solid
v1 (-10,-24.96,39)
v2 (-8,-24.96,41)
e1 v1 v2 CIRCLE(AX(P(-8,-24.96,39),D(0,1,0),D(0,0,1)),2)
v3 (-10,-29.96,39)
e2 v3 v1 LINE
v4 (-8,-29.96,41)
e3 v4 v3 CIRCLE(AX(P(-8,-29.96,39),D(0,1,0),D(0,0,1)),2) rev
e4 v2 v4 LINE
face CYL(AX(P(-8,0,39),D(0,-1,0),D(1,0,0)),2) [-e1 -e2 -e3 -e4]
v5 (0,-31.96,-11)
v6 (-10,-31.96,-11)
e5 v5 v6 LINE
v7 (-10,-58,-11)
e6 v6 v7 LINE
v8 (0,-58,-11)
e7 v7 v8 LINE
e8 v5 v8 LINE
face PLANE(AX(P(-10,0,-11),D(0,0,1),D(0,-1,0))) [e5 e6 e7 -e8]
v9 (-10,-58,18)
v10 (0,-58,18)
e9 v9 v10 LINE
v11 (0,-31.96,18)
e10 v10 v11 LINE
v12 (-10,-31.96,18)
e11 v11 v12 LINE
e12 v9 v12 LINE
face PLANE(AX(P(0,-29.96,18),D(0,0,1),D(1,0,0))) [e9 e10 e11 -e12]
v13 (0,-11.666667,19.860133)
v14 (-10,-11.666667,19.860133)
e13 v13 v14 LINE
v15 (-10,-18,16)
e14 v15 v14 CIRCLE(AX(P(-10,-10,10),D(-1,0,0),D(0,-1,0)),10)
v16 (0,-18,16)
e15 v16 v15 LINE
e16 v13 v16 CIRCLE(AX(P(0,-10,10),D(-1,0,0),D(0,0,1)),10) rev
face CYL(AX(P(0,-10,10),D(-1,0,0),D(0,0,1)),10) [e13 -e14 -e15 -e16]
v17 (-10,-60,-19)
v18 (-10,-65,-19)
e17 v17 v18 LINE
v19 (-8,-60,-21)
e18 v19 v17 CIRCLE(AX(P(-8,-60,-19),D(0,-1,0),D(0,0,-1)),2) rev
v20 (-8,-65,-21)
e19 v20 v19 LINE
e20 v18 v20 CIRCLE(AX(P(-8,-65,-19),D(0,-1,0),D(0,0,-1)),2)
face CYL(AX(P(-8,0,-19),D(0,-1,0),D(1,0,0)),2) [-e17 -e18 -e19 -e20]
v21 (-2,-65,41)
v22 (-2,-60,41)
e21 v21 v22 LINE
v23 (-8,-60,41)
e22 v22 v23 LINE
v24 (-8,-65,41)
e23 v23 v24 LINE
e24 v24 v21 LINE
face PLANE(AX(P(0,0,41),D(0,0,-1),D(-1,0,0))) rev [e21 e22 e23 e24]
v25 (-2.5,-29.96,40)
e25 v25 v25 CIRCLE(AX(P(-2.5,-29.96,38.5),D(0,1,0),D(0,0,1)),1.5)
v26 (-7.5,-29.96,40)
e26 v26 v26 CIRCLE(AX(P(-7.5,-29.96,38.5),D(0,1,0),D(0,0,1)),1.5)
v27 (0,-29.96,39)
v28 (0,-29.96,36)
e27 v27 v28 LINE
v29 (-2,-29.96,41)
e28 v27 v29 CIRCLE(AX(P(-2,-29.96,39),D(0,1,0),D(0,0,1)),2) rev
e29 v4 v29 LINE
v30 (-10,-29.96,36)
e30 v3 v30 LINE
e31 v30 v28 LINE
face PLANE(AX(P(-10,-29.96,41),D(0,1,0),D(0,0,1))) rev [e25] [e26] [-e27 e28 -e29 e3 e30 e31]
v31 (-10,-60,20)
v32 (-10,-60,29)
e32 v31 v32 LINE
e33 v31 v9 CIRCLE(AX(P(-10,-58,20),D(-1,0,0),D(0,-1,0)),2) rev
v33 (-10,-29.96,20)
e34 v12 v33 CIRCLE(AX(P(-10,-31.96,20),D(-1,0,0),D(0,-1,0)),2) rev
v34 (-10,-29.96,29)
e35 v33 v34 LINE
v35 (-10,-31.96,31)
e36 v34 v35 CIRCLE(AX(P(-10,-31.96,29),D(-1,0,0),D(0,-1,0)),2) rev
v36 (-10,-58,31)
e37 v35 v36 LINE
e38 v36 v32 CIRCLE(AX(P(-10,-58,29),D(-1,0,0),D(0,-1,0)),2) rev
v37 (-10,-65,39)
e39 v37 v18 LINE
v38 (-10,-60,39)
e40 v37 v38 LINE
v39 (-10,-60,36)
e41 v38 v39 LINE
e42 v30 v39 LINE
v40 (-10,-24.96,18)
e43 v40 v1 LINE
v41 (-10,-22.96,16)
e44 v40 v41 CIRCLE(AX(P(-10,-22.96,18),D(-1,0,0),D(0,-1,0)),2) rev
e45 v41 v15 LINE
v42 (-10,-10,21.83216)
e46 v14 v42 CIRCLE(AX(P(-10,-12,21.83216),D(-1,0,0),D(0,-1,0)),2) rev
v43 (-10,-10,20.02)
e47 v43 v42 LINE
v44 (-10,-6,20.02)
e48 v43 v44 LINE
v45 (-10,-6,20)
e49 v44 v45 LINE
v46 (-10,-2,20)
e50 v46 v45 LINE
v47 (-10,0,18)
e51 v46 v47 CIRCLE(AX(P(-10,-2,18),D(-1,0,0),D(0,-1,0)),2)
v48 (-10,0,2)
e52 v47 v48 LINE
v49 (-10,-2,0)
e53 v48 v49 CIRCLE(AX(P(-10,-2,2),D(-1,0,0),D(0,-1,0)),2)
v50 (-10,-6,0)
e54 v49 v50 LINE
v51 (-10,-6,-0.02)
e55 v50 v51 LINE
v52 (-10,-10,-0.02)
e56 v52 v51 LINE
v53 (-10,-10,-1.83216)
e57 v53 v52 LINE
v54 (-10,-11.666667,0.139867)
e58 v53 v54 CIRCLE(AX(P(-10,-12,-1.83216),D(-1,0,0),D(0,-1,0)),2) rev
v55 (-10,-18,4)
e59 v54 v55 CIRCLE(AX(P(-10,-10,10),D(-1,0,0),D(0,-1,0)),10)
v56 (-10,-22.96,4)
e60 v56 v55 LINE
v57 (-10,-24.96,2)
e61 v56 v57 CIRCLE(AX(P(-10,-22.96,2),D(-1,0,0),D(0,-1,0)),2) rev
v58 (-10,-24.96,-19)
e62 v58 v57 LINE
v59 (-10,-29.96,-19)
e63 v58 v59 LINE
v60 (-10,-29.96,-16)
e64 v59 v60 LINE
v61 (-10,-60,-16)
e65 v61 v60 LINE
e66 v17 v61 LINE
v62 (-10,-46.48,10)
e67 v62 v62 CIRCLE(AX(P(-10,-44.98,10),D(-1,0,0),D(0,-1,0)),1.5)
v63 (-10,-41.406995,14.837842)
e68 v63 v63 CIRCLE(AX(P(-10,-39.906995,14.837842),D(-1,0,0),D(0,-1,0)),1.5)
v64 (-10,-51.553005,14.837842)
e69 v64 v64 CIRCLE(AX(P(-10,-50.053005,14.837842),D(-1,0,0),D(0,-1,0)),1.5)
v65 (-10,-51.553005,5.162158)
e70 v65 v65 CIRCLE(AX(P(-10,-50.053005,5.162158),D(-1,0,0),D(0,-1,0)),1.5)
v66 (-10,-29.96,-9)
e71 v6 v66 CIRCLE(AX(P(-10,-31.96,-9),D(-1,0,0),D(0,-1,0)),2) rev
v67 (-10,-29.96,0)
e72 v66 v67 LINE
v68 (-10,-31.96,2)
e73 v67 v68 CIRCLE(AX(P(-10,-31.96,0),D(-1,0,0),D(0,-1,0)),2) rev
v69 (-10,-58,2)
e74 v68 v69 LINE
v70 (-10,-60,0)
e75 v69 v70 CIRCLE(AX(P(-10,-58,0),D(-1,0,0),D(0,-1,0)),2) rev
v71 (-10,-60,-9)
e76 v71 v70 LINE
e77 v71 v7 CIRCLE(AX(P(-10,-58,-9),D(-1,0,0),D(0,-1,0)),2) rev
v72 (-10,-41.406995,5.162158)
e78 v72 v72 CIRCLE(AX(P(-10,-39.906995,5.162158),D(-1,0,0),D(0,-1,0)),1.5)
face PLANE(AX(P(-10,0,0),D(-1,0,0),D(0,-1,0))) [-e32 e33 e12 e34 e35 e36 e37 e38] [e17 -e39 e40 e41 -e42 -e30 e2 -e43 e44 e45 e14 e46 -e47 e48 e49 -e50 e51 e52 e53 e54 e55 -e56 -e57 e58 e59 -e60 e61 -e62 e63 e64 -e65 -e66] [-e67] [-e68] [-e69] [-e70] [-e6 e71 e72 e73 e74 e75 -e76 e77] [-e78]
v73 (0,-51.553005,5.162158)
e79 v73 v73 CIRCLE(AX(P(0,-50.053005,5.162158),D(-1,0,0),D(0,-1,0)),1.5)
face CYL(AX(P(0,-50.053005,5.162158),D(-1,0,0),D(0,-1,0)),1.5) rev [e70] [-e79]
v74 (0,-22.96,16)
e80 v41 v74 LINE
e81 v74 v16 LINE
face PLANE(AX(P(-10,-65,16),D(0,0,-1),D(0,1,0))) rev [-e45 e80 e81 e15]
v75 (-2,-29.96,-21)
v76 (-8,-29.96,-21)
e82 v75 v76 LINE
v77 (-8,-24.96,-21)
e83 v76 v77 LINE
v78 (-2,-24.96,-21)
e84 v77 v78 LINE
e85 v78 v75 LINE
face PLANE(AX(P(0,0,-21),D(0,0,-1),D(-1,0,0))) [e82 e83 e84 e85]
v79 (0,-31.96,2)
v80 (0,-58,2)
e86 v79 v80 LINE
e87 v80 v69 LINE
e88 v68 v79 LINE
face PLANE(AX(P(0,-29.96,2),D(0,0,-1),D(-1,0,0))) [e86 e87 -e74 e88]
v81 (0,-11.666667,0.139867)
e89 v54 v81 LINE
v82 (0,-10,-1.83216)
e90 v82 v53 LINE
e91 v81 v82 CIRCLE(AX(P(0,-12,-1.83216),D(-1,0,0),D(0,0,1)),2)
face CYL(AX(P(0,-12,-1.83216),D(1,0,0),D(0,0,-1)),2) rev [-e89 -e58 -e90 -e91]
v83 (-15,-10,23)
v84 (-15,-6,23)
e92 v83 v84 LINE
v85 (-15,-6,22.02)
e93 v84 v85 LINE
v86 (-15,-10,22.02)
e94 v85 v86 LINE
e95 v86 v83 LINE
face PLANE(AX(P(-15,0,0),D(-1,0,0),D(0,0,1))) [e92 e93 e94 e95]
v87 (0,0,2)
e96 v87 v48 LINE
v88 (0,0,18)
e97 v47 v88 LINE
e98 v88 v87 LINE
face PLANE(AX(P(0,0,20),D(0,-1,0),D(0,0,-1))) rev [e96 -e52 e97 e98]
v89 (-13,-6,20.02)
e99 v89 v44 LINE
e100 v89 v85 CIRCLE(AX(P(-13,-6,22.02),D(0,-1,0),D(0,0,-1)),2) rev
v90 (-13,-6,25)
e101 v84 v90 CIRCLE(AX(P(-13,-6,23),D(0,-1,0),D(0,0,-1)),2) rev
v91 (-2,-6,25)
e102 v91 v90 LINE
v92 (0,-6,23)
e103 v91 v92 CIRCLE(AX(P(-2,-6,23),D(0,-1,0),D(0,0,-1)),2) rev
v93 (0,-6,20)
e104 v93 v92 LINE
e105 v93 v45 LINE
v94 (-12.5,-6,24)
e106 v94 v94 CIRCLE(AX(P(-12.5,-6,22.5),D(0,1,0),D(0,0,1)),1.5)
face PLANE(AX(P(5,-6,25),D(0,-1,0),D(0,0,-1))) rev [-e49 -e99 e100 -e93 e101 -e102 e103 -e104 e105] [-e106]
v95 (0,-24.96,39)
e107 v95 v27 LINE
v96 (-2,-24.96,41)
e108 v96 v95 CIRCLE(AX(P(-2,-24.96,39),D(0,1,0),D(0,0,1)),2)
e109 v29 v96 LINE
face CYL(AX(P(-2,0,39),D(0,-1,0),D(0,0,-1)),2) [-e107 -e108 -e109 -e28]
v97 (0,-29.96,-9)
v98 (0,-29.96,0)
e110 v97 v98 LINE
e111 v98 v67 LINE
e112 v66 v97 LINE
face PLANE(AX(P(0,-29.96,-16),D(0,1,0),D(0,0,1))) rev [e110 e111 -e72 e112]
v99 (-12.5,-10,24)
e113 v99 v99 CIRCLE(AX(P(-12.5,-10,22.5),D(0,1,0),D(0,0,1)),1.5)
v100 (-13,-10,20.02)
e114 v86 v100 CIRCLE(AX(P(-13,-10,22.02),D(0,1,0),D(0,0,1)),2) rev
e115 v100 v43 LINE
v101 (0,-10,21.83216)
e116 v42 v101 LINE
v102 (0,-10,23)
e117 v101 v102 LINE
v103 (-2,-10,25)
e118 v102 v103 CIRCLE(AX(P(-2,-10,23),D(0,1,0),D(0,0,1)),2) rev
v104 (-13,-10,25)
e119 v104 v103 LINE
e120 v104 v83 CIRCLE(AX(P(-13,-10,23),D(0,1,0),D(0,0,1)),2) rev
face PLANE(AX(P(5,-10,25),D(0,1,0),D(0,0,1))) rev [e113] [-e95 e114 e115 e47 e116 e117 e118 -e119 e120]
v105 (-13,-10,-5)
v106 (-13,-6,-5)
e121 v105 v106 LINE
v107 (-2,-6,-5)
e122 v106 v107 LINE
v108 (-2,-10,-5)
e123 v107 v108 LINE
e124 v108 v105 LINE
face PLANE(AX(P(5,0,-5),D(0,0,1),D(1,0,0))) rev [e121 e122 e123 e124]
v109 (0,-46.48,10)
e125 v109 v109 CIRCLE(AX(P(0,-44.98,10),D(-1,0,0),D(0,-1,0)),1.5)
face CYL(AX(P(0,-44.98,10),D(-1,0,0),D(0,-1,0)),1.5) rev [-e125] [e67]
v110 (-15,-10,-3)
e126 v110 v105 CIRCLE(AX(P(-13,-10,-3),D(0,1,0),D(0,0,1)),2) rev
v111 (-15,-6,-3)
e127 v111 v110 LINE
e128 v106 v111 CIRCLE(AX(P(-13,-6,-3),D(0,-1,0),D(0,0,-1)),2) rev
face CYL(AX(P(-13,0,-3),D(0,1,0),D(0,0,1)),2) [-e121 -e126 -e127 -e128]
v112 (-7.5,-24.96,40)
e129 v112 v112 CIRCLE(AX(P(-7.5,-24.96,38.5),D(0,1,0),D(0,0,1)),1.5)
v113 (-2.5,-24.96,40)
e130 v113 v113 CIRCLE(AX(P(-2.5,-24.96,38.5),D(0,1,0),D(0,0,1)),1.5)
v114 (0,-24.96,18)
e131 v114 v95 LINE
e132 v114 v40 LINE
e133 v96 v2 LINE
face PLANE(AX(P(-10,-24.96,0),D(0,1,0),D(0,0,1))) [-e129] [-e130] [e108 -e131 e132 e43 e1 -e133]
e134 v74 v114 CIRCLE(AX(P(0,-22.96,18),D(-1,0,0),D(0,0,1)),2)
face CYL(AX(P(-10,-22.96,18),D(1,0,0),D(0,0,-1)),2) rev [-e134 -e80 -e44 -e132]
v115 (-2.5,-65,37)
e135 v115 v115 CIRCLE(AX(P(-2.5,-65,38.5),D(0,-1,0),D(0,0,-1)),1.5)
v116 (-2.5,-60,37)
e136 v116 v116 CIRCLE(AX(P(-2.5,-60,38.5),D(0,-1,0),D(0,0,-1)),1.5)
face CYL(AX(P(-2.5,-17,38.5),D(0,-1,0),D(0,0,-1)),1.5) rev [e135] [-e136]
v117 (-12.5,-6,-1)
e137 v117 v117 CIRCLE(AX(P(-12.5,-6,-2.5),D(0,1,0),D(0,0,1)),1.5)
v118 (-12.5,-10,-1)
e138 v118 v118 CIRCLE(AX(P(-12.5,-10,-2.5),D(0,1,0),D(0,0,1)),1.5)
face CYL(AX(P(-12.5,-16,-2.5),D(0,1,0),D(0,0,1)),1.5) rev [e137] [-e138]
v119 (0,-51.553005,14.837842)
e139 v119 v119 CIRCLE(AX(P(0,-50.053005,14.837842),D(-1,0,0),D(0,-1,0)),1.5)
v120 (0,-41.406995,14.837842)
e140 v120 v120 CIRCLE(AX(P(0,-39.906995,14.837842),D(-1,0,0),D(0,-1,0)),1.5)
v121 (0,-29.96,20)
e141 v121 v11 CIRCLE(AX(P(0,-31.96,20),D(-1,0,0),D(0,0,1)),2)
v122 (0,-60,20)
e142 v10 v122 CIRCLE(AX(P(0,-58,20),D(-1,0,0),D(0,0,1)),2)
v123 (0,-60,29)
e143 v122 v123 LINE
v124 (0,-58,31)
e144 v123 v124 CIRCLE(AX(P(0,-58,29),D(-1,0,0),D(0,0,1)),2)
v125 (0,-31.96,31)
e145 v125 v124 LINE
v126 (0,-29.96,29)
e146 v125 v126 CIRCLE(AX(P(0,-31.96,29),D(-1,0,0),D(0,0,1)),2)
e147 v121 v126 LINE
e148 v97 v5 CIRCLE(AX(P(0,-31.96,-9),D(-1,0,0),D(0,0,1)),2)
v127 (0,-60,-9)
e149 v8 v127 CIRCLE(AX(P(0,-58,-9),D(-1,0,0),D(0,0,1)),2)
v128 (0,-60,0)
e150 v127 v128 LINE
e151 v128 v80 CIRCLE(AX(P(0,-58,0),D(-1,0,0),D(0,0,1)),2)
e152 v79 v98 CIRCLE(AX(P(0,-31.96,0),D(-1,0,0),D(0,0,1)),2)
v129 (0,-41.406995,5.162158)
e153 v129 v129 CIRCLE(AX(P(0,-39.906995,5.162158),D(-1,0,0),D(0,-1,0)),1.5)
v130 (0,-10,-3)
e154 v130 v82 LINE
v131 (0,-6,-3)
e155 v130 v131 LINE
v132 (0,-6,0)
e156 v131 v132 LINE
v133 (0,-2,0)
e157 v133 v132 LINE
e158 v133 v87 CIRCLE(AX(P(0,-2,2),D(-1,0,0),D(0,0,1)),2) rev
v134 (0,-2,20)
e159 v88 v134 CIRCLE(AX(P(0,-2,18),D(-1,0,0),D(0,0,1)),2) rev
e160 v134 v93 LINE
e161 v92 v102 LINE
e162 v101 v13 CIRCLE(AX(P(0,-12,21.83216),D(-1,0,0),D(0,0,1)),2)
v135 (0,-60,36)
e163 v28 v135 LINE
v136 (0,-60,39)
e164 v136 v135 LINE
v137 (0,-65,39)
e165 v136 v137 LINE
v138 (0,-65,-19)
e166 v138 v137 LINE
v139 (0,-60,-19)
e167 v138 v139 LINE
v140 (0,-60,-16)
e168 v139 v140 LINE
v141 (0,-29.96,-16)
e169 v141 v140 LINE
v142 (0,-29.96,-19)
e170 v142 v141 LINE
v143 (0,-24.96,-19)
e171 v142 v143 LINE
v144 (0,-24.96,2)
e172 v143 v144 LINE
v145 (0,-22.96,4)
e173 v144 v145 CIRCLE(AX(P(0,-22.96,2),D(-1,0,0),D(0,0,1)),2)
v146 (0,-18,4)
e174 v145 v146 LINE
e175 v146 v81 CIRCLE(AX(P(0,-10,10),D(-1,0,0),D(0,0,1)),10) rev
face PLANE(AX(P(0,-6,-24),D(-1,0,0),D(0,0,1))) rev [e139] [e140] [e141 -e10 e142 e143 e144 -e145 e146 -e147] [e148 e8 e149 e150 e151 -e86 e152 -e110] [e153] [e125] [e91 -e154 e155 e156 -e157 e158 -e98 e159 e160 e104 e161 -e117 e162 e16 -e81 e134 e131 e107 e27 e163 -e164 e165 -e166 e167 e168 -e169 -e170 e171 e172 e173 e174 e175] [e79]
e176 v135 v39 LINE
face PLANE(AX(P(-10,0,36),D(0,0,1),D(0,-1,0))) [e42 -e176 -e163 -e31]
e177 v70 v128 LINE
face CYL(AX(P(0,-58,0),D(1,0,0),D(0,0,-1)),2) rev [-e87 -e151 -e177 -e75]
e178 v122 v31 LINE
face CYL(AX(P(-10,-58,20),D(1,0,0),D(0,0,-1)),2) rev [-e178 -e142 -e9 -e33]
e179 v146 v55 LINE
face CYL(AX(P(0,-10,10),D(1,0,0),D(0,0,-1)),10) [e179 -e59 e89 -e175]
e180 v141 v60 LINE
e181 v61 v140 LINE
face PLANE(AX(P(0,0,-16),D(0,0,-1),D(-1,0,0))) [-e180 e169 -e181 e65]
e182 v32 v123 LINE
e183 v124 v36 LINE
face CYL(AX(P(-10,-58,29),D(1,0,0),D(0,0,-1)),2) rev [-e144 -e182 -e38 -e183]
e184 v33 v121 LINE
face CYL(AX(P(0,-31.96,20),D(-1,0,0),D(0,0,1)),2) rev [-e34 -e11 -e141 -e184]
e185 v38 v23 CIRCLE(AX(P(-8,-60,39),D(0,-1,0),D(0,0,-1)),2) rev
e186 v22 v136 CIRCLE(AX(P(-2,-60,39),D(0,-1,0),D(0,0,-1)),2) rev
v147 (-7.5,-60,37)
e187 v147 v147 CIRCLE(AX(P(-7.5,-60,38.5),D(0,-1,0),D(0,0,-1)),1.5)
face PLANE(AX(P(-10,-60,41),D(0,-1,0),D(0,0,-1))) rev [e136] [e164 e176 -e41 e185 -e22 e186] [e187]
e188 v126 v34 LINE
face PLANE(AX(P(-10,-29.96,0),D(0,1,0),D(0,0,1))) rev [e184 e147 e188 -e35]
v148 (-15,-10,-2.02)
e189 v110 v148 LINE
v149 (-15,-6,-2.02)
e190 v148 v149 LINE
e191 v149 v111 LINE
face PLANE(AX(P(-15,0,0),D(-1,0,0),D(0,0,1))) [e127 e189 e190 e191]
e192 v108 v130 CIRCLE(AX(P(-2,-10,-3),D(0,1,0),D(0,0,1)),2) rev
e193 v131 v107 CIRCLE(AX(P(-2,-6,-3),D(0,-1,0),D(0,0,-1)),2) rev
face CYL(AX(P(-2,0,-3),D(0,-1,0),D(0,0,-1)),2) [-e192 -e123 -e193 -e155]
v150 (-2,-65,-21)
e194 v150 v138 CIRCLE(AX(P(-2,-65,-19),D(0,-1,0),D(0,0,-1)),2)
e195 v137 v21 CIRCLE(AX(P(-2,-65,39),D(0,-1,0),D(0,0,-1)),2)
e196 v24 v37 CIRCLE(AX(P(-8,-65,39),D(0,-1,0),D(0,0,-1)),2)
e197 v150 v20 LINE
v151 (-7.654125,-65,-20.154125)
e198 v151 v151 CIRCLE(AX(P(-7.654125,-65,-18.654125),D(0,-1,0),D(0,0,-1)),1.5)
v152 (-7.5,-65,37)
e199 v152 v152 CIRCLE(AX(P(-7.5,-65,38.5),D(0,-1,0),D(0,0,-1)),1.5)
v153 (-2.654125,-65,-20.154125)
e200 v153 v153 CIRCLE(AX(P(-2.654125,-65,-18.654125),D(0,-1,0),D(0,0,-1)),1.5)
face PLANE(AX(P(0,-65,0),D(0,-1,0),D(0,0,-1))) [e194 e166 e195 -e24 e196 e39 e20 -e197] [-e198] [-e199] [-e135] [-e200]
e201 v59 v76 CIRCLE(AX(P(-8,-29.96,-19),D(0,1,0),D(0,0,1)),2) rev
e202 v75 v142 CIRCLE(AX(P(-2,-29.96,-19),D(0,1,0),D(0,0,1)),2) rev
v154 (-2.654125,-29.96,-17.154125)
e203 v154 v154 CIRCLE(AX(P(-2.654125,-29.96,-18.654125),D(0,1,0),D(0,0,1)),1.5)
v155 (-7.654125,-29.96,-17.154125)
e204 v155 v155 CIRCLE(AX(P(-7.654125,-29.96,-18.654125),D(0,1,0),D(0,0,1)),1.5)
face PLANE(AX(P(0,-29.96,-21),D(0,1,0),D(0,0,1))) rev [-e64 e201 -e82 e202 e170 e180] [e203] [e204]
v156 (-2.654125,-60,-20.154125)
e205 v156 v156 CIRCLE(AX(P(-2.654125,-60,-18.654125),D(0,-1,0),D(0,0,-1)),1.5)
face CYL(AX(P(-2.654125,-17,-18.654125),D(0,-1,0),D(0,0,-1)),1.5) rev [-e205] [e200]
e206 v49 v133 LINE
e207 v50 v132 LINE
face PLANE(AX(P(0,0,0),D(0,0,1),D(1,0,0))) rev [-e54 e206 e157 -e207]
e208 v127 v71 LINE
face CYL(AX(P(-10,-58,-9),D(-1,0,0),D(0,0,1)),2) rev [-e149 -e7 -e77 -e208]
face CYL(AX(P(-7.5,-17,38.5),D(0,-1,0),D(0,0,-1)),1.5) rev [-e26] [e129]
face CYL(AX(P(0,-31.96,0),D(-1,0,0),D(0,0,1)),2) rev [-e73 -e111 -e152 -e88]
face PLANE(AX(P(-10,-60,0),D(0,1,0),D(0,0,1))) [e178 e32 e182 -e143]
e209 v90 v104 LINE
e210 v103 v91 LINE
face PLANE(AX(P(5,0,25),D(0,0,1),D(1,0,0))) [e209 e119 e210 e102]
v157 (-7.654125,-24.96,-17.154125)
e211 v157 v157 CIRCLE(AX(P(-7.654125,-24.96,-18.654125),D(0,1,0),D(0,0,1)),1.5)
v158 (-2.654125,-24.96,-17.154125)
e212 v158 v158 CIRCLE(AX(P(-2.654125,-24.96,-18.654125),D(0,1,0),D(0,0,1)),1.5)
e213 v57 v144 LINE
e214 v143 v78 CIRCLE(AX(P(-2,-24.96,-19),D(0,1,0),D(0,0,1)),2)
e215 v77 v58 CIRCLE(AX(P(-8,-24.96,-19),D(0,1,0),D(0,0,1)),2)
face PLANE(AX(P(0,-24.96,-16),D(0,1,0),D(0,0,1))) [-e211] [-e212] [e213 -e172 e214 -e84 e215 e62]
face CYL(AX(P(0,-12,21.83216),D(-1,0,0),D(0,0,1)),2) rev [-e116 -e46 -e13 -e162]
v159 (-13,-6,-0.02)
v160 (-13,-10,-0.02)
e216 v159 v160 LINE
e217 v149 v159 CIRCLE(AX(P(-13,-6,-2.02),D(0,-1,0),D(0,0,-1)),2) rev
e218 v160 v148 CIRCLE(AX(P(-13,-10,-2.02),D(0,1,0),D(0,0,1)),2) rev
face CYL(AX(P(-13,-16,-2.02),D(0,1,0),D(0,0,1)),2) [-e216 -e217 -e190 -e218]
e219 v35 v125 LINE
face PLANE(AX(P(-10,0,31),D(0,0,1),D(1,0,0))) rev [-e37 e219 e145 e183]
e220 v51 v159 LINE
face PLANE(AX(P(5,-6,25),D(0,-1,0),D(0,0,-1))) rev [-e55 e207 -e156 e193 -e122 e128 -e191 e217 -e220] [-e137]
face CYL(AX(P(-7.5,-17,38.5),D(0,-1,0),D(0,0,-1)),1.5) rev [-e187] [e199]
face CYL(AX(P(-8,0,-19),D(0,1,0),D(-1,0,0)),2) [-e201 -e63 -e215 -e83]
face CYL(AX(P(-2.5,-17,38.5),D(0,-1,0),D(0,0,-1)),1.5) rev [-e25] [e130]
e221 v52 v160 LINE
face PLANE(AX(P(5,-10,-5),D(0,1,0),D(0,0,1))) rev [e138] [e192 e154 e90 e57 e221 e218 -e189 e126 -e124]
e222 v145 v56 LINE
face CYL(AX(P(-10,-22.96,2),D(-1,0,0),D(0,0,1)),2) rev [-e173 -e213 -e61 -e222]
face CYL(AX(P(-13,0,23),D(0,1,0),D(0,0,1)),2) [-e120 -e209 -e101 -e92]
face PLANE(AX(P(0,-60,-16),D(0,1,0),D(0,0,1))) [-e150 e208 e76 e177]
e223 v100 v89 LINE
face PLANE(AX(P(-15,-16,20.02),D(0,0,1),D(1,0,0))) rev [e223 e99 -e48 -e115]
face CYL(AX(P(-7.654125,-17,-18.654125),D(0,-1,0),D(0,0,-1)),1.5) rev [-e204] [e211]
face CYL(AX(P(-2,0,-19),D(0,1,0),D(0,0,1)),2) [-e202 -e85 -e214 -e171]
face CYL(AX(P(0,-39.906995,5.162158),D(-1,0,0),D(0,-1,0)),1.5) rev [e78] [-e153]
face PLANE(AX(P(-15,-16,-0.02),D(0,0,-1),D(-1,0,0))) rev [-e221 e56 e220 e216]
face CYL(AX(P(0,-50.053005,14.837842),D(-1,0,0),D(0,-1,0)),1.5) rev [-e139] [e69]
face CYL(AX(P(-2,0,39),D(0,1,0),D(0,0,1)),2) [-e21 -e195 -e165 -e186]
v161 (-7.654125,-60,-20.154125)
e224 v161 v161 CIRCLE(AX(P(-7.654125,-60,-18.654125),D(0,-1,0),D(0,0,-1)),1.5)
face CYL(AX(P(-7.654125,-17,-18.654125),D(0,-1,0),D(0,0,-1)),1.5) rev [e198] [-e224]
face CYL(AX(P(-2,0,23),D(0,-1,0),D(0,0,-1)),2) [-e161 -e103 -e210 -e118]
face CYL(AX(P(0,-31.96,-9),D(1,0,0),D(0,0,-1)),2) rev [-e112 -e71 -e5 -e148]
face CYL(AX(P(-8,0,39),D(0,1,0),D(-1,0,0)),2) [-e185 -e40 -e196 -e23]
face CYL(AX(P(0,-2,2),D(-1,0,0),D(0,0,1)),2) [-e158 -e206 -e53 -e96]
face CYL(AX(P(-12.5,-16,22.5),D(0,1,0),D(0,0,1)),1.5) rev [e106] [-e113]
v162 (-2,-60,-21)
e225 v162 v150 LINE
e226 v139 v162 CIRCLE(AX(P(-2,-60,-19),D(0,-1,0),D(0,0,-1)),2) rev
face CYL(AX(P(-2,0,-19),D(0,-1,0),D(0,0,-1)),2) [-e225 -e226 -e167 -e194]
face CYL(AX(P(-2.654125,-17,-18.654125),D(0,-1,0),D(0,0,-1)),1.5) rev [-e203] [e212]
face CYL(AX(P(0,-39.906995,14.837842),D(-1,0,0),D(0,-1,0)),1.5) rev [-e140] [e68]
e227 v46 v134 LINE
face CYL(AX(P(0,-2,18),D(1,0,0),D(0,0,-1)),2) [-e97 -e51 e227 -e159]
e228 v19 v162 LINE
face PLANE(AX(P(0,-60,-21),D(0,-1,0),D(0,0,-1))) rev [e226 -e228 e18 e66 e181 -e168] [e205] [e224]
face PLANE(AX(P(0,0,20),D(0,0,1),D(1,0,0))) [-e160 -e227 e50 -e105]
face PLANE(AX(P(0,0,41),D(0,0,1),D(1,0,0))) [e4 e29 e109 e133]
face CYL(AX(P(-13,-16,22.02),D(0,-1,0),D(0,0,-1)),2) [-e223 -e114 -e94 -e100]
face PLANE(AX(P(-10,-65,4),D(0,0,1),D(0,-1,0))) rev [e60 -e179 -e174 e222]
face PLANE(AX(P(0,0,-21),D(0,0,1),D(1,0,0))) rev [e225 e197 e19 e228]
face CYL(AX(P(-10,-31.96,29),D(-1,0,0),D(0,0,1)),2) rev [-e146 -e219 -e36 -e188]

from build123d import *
from build123d.topology import SkipClean

# Parameters (mm, degrees)
SKETCH1_W            = 90
SKETCH1_H            = 20
BOSS_EXTRUDE1_DEPTH  = 20
SKETCH2_W            = 90
SKETCH2_H            = 3
CUT_EXTRUDE1_DEPTH   = 10
SKETCH3_W            = 3
SKETCH3_H            = 5
CUT_EXTRUDE2_DEPTH   = 10
SKETCH4_W            = 3
SKETCH4_H            = 1.75
SKETCH4_W_2          = 2.997618753
SKETCH4_W_3          = 3.002941468
CUT_EXTRUDE3_DEPTH   = 5
SKETCH5_W            = 1.5
SKETCH5_H            = 3
BOSS_EXTRUDE2_DEPTH  = 10
SKETCH6_W            = 1.5
SKETCH6_H            = 3
BOSS_EXTRUDE3_DEPTH  = 18
BOSS_EXTRUDE4_DEPTH  = 5
FILLET1_START        = 8.5
FILLET1_DEPTH        = 3
FILLET1_START_2      = 8
FILLET1_2_DEPTH      = 4
FILLET2_R            = 10
SKETCH8_W            = 20.140972823
SKETCH8_H            = 2
CUT_EXTRUDE4_DEPTH   = 119
FILLET3_R            = 2
SKETCH9_W            = 5
SKETCH9_H            = 4
BOSS_EXTRUDE6_DEPTH  = 5
SKETCH11_W           = 5
SKETCH11_H           = 4
BOSS_EXTRUDE7_DEPTH  = 5
SKETCH12_R           = 1.5
CUT_EXTRUDE5_DEPTH   = 24
FILLET4_R            = 2
SKETCH14_W           = 71.95999564
SKETCH14_H           = 44.647918029
CUT_EXTRUDE8_DEPTH   = 55
BOSS_EXTRUDE8_START  = 1.5
BOSS_EXTRUDE8_DEPTH  = 1.5
SKETCH16_W           = 5.976122604
SKETCH16_H           = 3
CUT_EXTRUDE9_DEPTH   = 10
SKETCH17_W           = 2
SKETCH17_H           = 3
BOSS_EXTRUDE9_DEPTH  = 10
BOSS_EXTRUDE10_DEPTH = 5
BOSS_EXTRUDE11_DEPTH = 10
SKETCH21_W           = 10
SKETCH21_H           = 4
BOSS_EXTRUDE21_DEPTH = 5
SKETCH22_R           = 1.5
CUT_EXTRUDE10_DEPTH  = 5
SKETCH23_W           = 10
SKETCH23_H           = 4
BOSS_EXTRUDE22_DEPTH = 5
SKETCH24_R           = 1.5
CUT_EXTRUDE11_DEPTH  = 5
SKETCH25_W           = 46.117576458
SKETCH25_H           = 7.536313902
CUT_EXTRUDE12_DEPTH  = 49
SKETCH26_W           = 45
SKETCH26_H           = 20
CUT_EXTRUDE13_DEPTH  = 49
SKETCH27_W           = 5
SKETCH27_H           = 4
BOSS_EXTRUDE23_DEPTH = 10
SKETCH28_R           = 1.5
CUT_EXTRUDE14_DEPTH  = 10
SKETCH29_W           = 5
SKETCH29_H           = 0.02
CUT_EXTRUDE15_DEPTH  = 10
FILLET8_R            = 2
SKETCH30_W           = 3
SKETCH30_H           = 12
CUT_EXTRUDE16_DEPTH  = 15
FILLET10_R           = 2
SKETCH32_R           = 1.5
CUT_EXTRUDE17_DEPTH  = 7.5
FILLET11_START       = -10
FILLET11_DEPTH       = 10
FILLET11_START_2     = -10.30822
FILLET11_2_DEPTH     = 10.61644
FILLET11_START_3     = -14.991159554
FILLET11_3_DEPTH     = 19.982319108
FILLET11_START_4     = -11.666666667
FILLET11_4_OUTLINE_R = 1.5
FILLET11_4_DEPTH     = 1.666666667
CUT_EXTRUDE19_DEPTH  = 32
SKETCH35_W           = 10
SKETCH35_H           = 12
BOSS_EXTRUDE24_DEPTH = 10
SKETCH36_W           = 10
SKETCH36_H           = 12
BOSS_EXTRUDE25_DEPTH = 16
SKETCH37_W           = 8.422588627
SKETCH37_H           = 30.638855418
CUT_EXTRUDE20_DEPTH  = 16
FILLET12_R           = 2
SKETCH38_W           = 10
SKETCH38_H           = 12
BOSS_EXTRUDE26_DEPTH = 47
SKETCH39_W           = 10
SKETCH39_H           = 5
BOSS_EXTRUDE27_DEPTH = 20
SKETCH41_W           = 5
SKETCH41_H           = 30.04
SKETCH41_W_2         = 15
SKETCH41_H_2         = 5
BOSS_EXTRUDE28_DEPTH = 10
SKETCH42_W           = 10
SKETCH42_H           = 5
BOSS_EXTRUDE29_DEPTH = 5
SKETCH43_W           = 10
SKETCH43_H           = 5
BOSS_EXTRUDE30_DEPTH = 5
SKETCH44_R           = 1.5
CUT_EXTRUDE21_DEPTH  = 48
FILLET13_R           = 2
SKETCH45_W           = 16
SKETCH45_H           = 30.04
BOSS_EXTRUDE31_DEPTH = 10
SKETCH46_R           = 1.5
CUT_EXTRUDE22_DEPTH  = 10
FILLET14_R           = 2


with BuildPart() as part:
    # Sketch1 → Boss-Extrude1 (new body)
    with BuildSketch(Plane.XY):
        with Locations((45, -10)):
            Rectangle(SKETCH1_W, SKETCH1_H)
    extrude(amount=BOSS_EXTRUDE1_DEPTH)

    # Sketch2 → Cut-Extrude1 (cut)
    with BuildSketch(Plane(origin=(0, 0, 0), x_dir=(1, 0, 0), z_dir=(0, 1, 0))):
        with Locations((45, -10)):
            Rectangle(SKETCH2_W, SKETCH2_H)
    extrude(amount=-CUT_EXTRUDE1_DEPTH, mode=Mode.SUBTRACT)

    # Sketch3 → Cut-Extrude2 (cut)
    with BuildSketch(Plane(origin=(0, 0, 0), x_dir=(1, 0, 0), z_dir=(0, 1, 0))):
        with Locations((11.25, -15.75)):
            Rectangle(SKETCH3_W, SKETCH3_H)
        with Locations((22.5, -15.75)):
            Rectangle(SKETCH3_W, SKETCH3_H)
        with Locations((33.75, -15.75)):
            Rectangle(SKETCH3_W, SKETCH3_H)
        with Locations((45, -15.75)):
            Rectangle(SKETCH3_W, SKETCH3_H)
        with Locations((56.25, -15.75)):
            Rectangle(SKETCH3_W, SKETCH3_H)
        with Locations((67.5, -15.75)):
            Rectangle(SKETCH3_W, SKETCH3_H)
        with Locations((78.75, -15.75)):
            Rectangle(SKETCH3_W, SKETCH3_H)
        with Locations((11.25, -4.25)):
            Rectangle(SKETCH3_W, SKETCH3_H)
        with Locations((22.5, -4.25)):
            Rectangle(SKETCH3_W, SKETCH3_H)
        with Locations((33.75, -4.25)):
            Rectangle(SKETCH3_W, SKETCH3_H)
        with Locations((45, -4.25)):
            Rectangle(SKETCH3_W, SKETCH3_H)
        with Locations((56.25, -4.25)):
            Rectangle(SKETCH3_W, SKETCH3_H)
        with Locations((67.5, -4.25)):
            Rectangle(SKETCH3_W, SKETCH3_H)
        with Locations((78.75, -4.25)):
            Rectangle(SKETCH3_W, SKETCH3_H)
    extrude(amount=-CUT_EXTRUDE2_DEPTH, mode=Mode.SUBTRACT)

    # Sketch4 → Cut-Extrude3 (cut)
    with BuildSketch(Plane(origin=(0, 0, 0), x_dir=(1, 0, 0), z_dir=(0, 1, 0))):
        with Locations((56.25, -19.125)):
            Rectangle(SKETCH4_W, SKETCH4_H)
        with Locations((67.5, -19.125)):
            Rectangle(SKETCH4_W, SKETCH4_H)
        Polygon((77.25, -18.25), (77.25, -20), (80.252941468, -20), (80.252941468, -18.25), (80.25, -18.25), align=None)
        with Locations((45, -19.125)):
            Rectangle(SKETCH4_W, SKETCH4_H)
        with Locations((33.748809377, -19.125)):
            Rectangle(SKETCH4_W_2, SKETCH4_H)
        with Locations((22.5, -19.125)):
            Rectangle(SKETCH4_W, SKETCH4_H)
        with Locations((11.25, -19.125)):
            Rectangle(SKETCH4_W, SKETCH4_H)
        with Locations((22.5, -0.875)):
            Rectangle(SKETCH4_W, SKETCH4_H)
        with Locations((33.748809377, -0.875)):
            Rectangle(SKETCH4_W_2, SKETCH4_H)
        with Locations((45, -0.875)):
            Rectangle(SKETCH4_W, SKETCH4_H)
        with Locations((56.25, -0.875)):
            Rectangle(SKETCH4_W, SKETCH4_H)
        with Locations((67.5, -0.875)):
            Rectangle(SKETCH4_W, SKETCH4_H)
        with Locations((78.751470734, -0.875)):
            Rectangle(SKETCH4_W_3, SKETCH4_H)
        with Locations((11.25, -0.875)):
            Rectangle(SKETCH4_W, SKETCH4_H)
    extrude(amount=-CUT_EXTRUDE3_DEPTH, mode=Mode.SUBTRACT)

    # Sketch5 → Boss-Extrude2 (add)
    with BuildSketch(Plane(origin=(0, -10, 0), x_dir=(1, 0, 0), z_dir=(0, 1, 0))):
        with Locations((0.75, -10)):
            Rectangle(SKETCH5_W, SKETCH5_H)
        with Locations((89.25, -10)):
            Rectangle(SKETCH5_W, SKETCH5_H)
    extrude(amount=BOSS_EXTRUDE2_DEPTH)

    # Sketch6 → Boss-Extrude3 (add)
    with BuildSketch(Plane(origin=(0, 0, 0), x_dir=(1, 0, 0), z_dir=(0, 1, 0))):
        with Locations((2.25, -10)):
            Rectangle(SKETCH6_W, SKETCH6_H)
        with Locations((87.75, -10)):
            Rectangle(SKETCH6_W, SKETCH6_H)
    extrude(amount=-BOSS_EXTRUDE3_DEPTH)

    # Sketch7 → Boss-Extrude4 (add)
    with BuildSketch(Plane.XY.offset(8.5)):
        Polygon((3, -9.907661673), (3, -10), (6, -10), (3, 0), align=None)
        Polygon((87, 0), (84, -10), (87, -10), align=None)
    extrude(amount=BOSS_EXTRUDE4_DEPTH)

    # Fillet1: read off the stored shape, not the designer's step
    # Fillet1 outline → Fillet1 (cut)
    with BuildSketch(Plane.XY.offset(FILLET1_START)):
        with BuildLine():
            ThreePointArc((1.511938698, 0), (2.705799758, -0.395414143), (3.427591269, -1.425304229))
            Line((3.427591269, -1.425304229), (3, 0))
            Line((3, 0), (1.511938698, 0))
        make_face()
        with BuildLine():
            Line((87, 0), (86.572408731, -1.425304229))
            ThreePointArc((86.572408731, -1.425304229), (87.294200242, -0.395414143), (88.488061302, 0))
            Line((88.488061302, 0), (87, 0))
        make_face()
    extrude(amount=FILLET1_DEPTH, mode=Mode.SUBTRACT)

    # Fillet1 2 outline → Fillet1 2 (add)
    with BuildSketch(Plane.XY.offset(FILLET1_START_2)):
        with BuildLine():
            Line((6, -10), (7.488061302, -10))
            ThreePointArc((7.488061302, -10), (6.294200242, -9.604585857), (5.572408731, -8.574695771))
            Line((5.572408731, -8.574695771), (6, -10))
        make_face()
        with BuildLine():
            ThreePointArc((84.427591269, -8.574695771), (83.705799758, -9.604585857), (82.511938698, -10))
            Line((82.511938698, -10), (84, -10))
            Line((84, -10), (84.427591269, -8.574695771))
        make_face()
    extrude(amount=FILLET1_2_DEPTH)

    # Fillet2
    fillet2_edges = [part.edges().sort_by_distance(p)[0] for p in [
        (45, -20, 0),
        (45, -20, 20),
    ]]
    fillet(fillet2_edges, radius=FILLET2_R - 0.0001)  # a hair under: the kernel refuses the full size

    # Sketch8 → Cut-Extrude4 (cut)
    with BuildSketch(Plane.ZY):
        with Locations((10.770725067, -19)):
            Rectangle(SKETCH8_W, SKETCH8_H)
    extrude(amount=-CUT_EXTRUDE4_DEPTH, mode=Mode.SUBTRACT)

    # Fillet3
    fillet3_edges = [part.edges().sort_by_distance(p)[0] for p in [
        (4.875, 0, 0),
        (4.875, 0, 20),
        (16.875, 0, 20),
        (16.875, 0, 0),
        (28.125, 0, 0),
        (28.125, 0, 20),
        (39.373809377, 0, 20),
        (39.373809377, 0, 0),
        (50.625, 0, 0),
        (50.625, 0, 20),
        (61.875, 0, 20),
        (61.875, 0, 0),
        (73.125, 0, 0),
        (73.125, 0, 20),
        (85.126470734, 0, 20),
        (85.126470734, 0, 0),
    ]]
    fillet(fillet3_edges, radius=FILLET3_R)

    # Sketch9 → Boss-Extrude6 (add)
    with BuildSketch(Plane.ZY):
        with Locations((-2.5, -4)):
            Rectangle(SKETCH9_W, SKETCH9_H)
        with Locations((22.5, -4)):
            Rectangle(SKETCH9_W, SKETCH9_H)
    extrude(amount=-BOSS_EXTRUDE6_DEPTH)

    # Sketch11 → Boss-Extrude7 (add)
    with BuildSketch(Plane(origin=(90, 0, 0), x_dir=(0, 0, -1), z_dir=(1, 0, 0))):
        with Locations((2.5, -4)):
            Rectangle(SKETCH11_W, SKETCH11_H)
        with Locations((-22.5, -4)):
            Rectangle(SKETCH11_W, SKETCH11_H)
    extrude(amount=-BOSS_EXTRUDE7_DEPTH)

    # Sketch12 → Cut-Extrude5 (cut)
    with BuildSketch(Plane(origin=(0, -2, 0), x_dir=(1, 0, 0), z_dir=(0, 1, 0))):
        with Locations(Location((2.5, 2.5, 0), (0, 0, 180))):
            Circle(SKETCH12_R)
        with Locations(Location((87.5, 2.5, 0), (0, 0, 180))):
            Circle(SKETCH12_R)
        with Locations(Location((87.5, -22.5, 0), (0, 0, 180))):
            Circle(SKETCH12_R)
        with Locations(Location((2.5, -22.5, 0), (0, 0, 180))):
            Circle(SKETCH12_R)
    extrude(amount=-CUT_EXTRUDE5_DEPTH, mode=Mode.SUBTRACT)

    # Fillet4
    fillet4_edges = [part.edges().sort_by_distance(p)[0] for p in [
        (0, -4, -5),
        (5, -4, -5),
        (5, -4, 25),
        (0, -4, 25),
        (85, -4, -5),
        (90, -4, -5),
        (85, -4, 25),
        (90, -4, 25),
    ]]
    fillet(fillet4_edges, radius=FILLET4_R)

    # Sketch14 → Cut-Extrude8 (cut)
    with BuildSketch(Plane(origin=(0, 0, 0), x_dir=(1, 0, 0), z_dir=(0, 1, 0))):
        with Locations((79.47999782, -11.65925291)):
            Rectangle(SKETCH14_W, SKETCH14_H)
    extrude(amount=-CUT_EXTRUDE8_DEPTH, mode=Mode.SUBTRACT)

    # Sketch15 → Boss-Extrude8 (add)
    with BuildSketch(Plane(origin=(43.5, 0, 0), x_dir=(0, 0, -1), z_dir=(1, 0, 0)).offset(BOSS_EXTRUDE8_START)):
        with BuildLine():
            Line((-11.5, 0), (-18, 0))
            ThreePointArc((-18, 0), (-19.414213562, -0.585786438), (-20, -2))
            Line((-20, -2), (-20, -10))
            ThreePointArc((-20, -10), (-18.94427191, -14.472135955), (-16, -18))
            Line((-16, -18), (-4, -18))
            ThreePointArc((-4, -18), (-1.05572809, -14.472135955), (0, -10))
            Line((0, -10), (0, -2))
            ThreePointArc((0, -2), (-0.585786438, -0.585786438), (-2, 0))
            Line((-2, 0), (-4, 0))
            Line((-4, 0), (-8.5, 0))
            Line((-8.5, 0), (-8.5, -10))
            Line((-8.5, -10), (-11.5, -10))
            Line((-11.5, -10), (-11.5, 0))
        make_face()
    extrude(amount=-BOSS_EXTRUDE8_DEPTH)

    # Sketch16 → Cut-Extrude9 (cut)
    with BuildSketch(Plane(origin=(0, 0, 0), x_dir=(1, 0, 0), z_dir=(0, 1, 0))):
        with Locations((4.5, -10)):
            Rectangle(SKETCH16_W, SKETCH16_H)
    extrude(amount=-CUT_EXTRUDE9_DEPTH, mode=Mode.SUBTRACT)

    # Sketch17 → Boss-Extrude9 (add)
    with BuildSketch(Plane(origin=(0, 0, 0), x_dir=(1, 0, 0), z_dir=(0, 1, 0))):
        Polygon((2, -8.5), (1.511938698, -8.5), (0, -8.5), (0, -11.5), (1.511938698, -11.5), (2, -11.5), align=None)
        with Locations((44, -10)):
            Rectangle(SKETCH17_W, SKETCH17_H)
    extrude(amount=-BOSS_EXTRUDE9_DEPTH)

    # Sketch18 → Boss-Extrude10 (add)
    with BuildSketch(Plane.XY.offset(8.5)):
        Polygon((4, -10), (2, 0), (2, -10), align=None)
        Polygon((43, 0), (41, -10), (43, -10), align=None)
    extrude(amount=BOSS_EXTRUDE10_DEPTH)

    # Sketch19 → Boss-Extrude11 (add)
    with BuildSketch(Plane.ZY):
        with BuildLine():
            ThreePointArc((2, 0), (0.585786438, -0.585786438), (0, -2))
            Line((0, -2), (0, -6))
            Line((0, -6), (0, -10))
            ThreePointArc((0, -10), (1.05572809, -14.472135955), (4, -18))
            Line((4, -18), (16, -18))
            ThreePointArc((16, -18), (18.94427191, -14.472135955), (20, -10))
            Line((20, -10), (20, -6))
            Line((20, -6), (20, -2))
            ThreePointArc((20, -2), (19.414213562, -0.585786438), (18, 0))
            Line((18, 0), (16, 0))
            Line((16, 0), (2, 0))
        make_face()
    extrude(amount=BOSS_EXTRUDE11_DEPTH)

    # Sketch21 → Boss-Extrude21 (add)
    with BuildSketch(Plane.XY.offset(20)):
        with Locations((0, -8)):
            Rectangle(SKETCH21_W, SKETCH21_H)
    extrude(amount=BOSS_EXTRUDE21_DEPTH)

    # Sketch22 → Cut-Extrude10 (cut)
    with BuildSketch(Plane(origin=(0, -6, 0), x_dir=(1, 0, 0), z_dir=(0, 1, 0))):
        with Locations(Location((2.5, -22.5, 0), (0, 0, 180))):
            Circle(SKETCH22_R)
    extrude(amount=-CUT_EXTRUDE10_DEPTH, mode=Mode.SUBTRACT)

    # Sketch23 → Boss-Extrude22 (add)
    with BuildSketch(Plane(origin=(0, 0, 0), x_dir=(-1, 0, 0), z_dir=(0, 0, -1))):
        with Locations((0, -8)):
            Rectangle(SKETCH23_W, SKETCH23_H)
    extrude(amount=BOSS_EXTRUDE22_DEPTH)

    # Sketch24 → Cut-Extrude11 (cut)
    with BuildSketch(Plane(origin=(0, -6, 0), x_dir=(1, 0, 0), z_dir=(0, 1, 0))):
        with Locations(Location((2.5, 2.5, 0), (0, 0, 180))):
            Circle(SKETCH24_R)
    extrude(amount=-CUT_EXTRUDE11_DEPTH, mode=Mode.SUBTRACT)

    # Sketch25 → Cut-Extrude12 (cut)
    with BuildSketch(Plane.XY.offset(25)):
        with Locations((23.058788229, -2.231843049)):
            Rectangle(SKETCH25_W, SKETCH25_H)
    extrude(amount=-CUT_EXTRUDE12_DEPTH, mode=Mode.SUBTRACT)

    # Sketch26 → Cut-Extrude13 (cut)
    with BuildSketch(Plane(origin=(0, -6, 0), x_dir=(1, 0, 0), z_dir=(0, 1, 0))):
        with Locations((22.5, -10)):
            Rectangle(SKETCH26_W, SKETCH26_H)
    extrude(amount=-CUT_EXTRUDE13_DEPTH, mode=Mode.SUBTRACT)

    # Sketch27 → Boss-Extrude23 (add)
    with BuildSketch(Plane.ZY.offset(5)):
        with Locations((-2.5, -8)):
            Rectangle(SKETCH27_W, SKETCH27_H)
        with Locations((22.5, -8)):
            Rectangle(SKETCH27_W, SKETCH27_H)
    extrude(amount=BOSS_EXTRUDE23_DEPTH)

    # Sketch28 → Cut-Extrude14 (cut)
    with BuildSketch(Plane(origin=(0, -6, 0), x_dir=(1, 0, 0), z_dir=(0, 1, 0))):
        with Locations(Location((-12.5, 2.5, 0), (0, 0, 270))):
            Circle(SKETCH28_R)
        with Locations(Location((-12.5, -22.5, 0), (0, 0, 270))):
            Circle(SKETCH28_R)
    extrude(amount=-CUT_EXTRUDE14_DEPTH, mode=Mode.SUBTRACT)

    # Sketch29 → Cut-Extrude15 (cut)
    with BuildSketch(Plane(origin=(0, -6, 0), x_dir=(1, 0, 0), z_dir=(0, 1, 0))):
        with Locations((-12.5, 0.01)):
            Rectangle(SKETCH29_W, SKETCH29_H)
        with Locations((2.5, 0.01)):
            Rectangle(SKETCH29_W, SKETCH29_H)
        with Locations((-12.5, -20.01)):
            Rectangle(SKETCH29_W, SKETCH29_H)
        with Locations((2.5, -20.01)):
            Rectangle(SKETCH29_W, SKETCH29_H)
    extrude(amount=-CUT_EXTRUDE15_DEPTH, mode=Mode.SUBTRACT)

    # Fillet8
    fillet8_edges = [part.edges().sort_by_distance(p)[0] for p in [
        (5, -8, 25),
        (5, -8, -5),
        (-15, -8, -5),
        (-15, -8, 25),
        (-15, -8, 20.02),
        (-15, -8, -0.02),
        (5, -8, -0.02),
        (5, -8, 20.02),
    ]]
    fillet(fillet8_edges, radius=FILLET8_R)

    # Sketch30 → Cut-Extrude16 (cut)
    with BuildSketch(Plane.XZ.offset(18)):
        with Locations((-5, 10)):
            Rectangle(SKETCH30_W, SKETCH30_H)
    extrude(amount=-CUT_EXTRUDE16_DEPTH, mode=Mode.SUBTRACT)

    # Fillet10
    fillet10_edges = [part.edges().sort_by_distance(p)[0] for p in [
        (-5, -3, 4),
        (-5, -3, 16),
    ]]
    fillet(fillet10_edges, radius=FILLET10_R)

    # Sketch32 → Cut-Extrude17 (cut, symmetric)
    with BuildSketch(Plane(origin=(-6.5, 0, 0), x_dir=(0, 0, -1), z_dir=(1, 0, 0))):
        with Locations(Location((-7, -10.5, 0), (0, 0, 270))):
            Circle(SKETCH32_R)
        with Locations(Location((-13, -10.5, 0), (0, 0, 270))):
            Circle(SKETCH32_R)
    extrude(amount=CUT_EXTRUDE17_DEPTH, both=True, mode=Mode.SUBTRACT)

    # Fillet11: read off the stored shape, not the designer's step
    # Fillet11 outline → Fillet11 (add)
    with BuildSketch(Plane.YZ.offset(FILLET11_START)):
        with BuildLine():
            Line((-10, 20), (-10, 21.832159566))
            ThreePointArc((-10, 21.832159566), (-10.472474768, 20.541165117), (-11.666666667, 19.860132972))
            ThreePointArc((-11.666666667, 19.860132972), (-10.836262603, 19.964971895), (-10, 20))
        make_face()
        with BuildLine():
            ThreePointArc((-11.666666667, 0.139867028), (-10.472474768, -0.541165117), (-10, -1.832159566))
            Line((-10, -1.832159566), (-10, 0))
            ThreePointArc((-10, 0), (-10.836262603, 0.035028105), (-11.666666667, 0.139867028))
        make_face()
    extrude(amount=FILLET11_DEPTH)

    # Fillet11 2 outline → Fillet11 2 (add)
    with BuildSketch(Plane.YZ.offset(FILLET11_START_2)):
        with BuildLine():
            Line((-11.153786252, 20.02), (-10, 20.02))
            Line((-10, 20.02), (-10, 21.832159566))
            ThreePointArc((-10, 21.832159566), (-10.312927462, 20.758015138), (-11.153786252, 20.02))
        make_face()
        with BuildLine():
            Line((-10, -0.02), (-11.153786252, -0.02))
            ThreePointArc((-11.153786252, -0.02), (-10.312927462, -0.758015138), (-10, -1.832159566))
            Line((-10, -1.832159566), (-10, -0.02))
        make_face()
    extrude(amount=FILLET11_2_DEPTH)

    # Fillet11 3 outline → Fillet11 3 (add)
    with BuildSketch(Plane.YZ.offset(FILLET11_START_3)):
        with BuildLine():
            Line((-11.153786252, 20.02), (-10, 20.02))
            Line((-10, 20.02), (-10, 21.832159566))
            ThreePointArc((-10, 21.832159566), (-10.312927462, 20.758015138), (-11.153786252, 20.02))
        make_face()
        with BuildLine():
            Line((-10, -0.02), (-11.153786252, -0.02))
            ThreePointArc((-11.153786252, -0.02), (-10.312927462, -0.758015138), (-10, -1.832159566))
            Line((-10, -1.832159566), (-10, -0.02))
        make_face()
    extrude(amount=FILLET11_3_DEPTH)

    # Fillet11 4 outline → Fillet11 4 (cut)
    with SkipClean():  # the faces are left unmerged after this step: merging them gives an invalid solid
        with BuildSketch(Plane(origin=(0, 0, 0), x_dir=(1, 0, 0), z_dir=(0, 1, 0)).offset(FILLET11_START_4)):
            with BuildLine():
                Line((-14.991159554, -20.02), (-14.991159455, -21.832159575))
                ThreePointArc((-14.991159455, -21.832159575), (-14.346164765, -20.540864975), (-13, -20.02))
                Line((-13, -20.02), (-14.991159554, -20.02))
            make_face()
            with BuildLine():
                ThreePointArc((-13, 0.02), (-14.346164765, 0.540864975), (-14.991159455, 1.832159575))
                Line((-14.991159455, 1.832159575), (-14.991159554, 0.02))
                Line((-14.991159554, 0.02), (-13, 0.02))
            make_face()
            with BuildLine():
                ThreePointArc((4.991159455, 1.832159575), (4.346164765, 0.540864975), (3, 0.02))
                Line((3, 0.02), (4.991159554, 0.02))
                Line((4.991159554, 0.02), (4.991159455, 1.832159575))
            make_face()
            with BuildLine():
                ThreePointArc((3, -20.02), (4.346164765, -20.540864975), (4.991159455, -21.832159575))
                Line((4.991159455, -21.832159575), (4.991159554, -20.02))
                Line((4.991159554, -20.02), (3, -20.02))
            make_face()
            with Locations((2.5, 2.5)):
                Circle(FILLET11_4_OUTLINE_R)
            with Locations((2.5, -22.5)):
                Circle(FILLET11_4_OUTLINE_R)
            with Locations((-12.5, -22.5)):
                Circle(FILLET11_4_OUTLINE_R)
            with Locations((-12.5, 2.5)):
                Circle(FILLET11_4_OUTLINE_R)
        extrude(amount=FILLET11_4_DEPTH, mode=Mode.SUBTRACT)

    # Sketch34 → Cut-Extrude19 (cut)
    with BuildSketch(Plane.XY.offset(25)):
        Polygon((5, -18), (5, -11.347298632), (5, -10), (3, -10), (0, -10), (0, -11.347298632), (0, -18), align=None)
        Polygon((-10, -18), (-10, -11.347298632), (-10, -10), (-13, -10), (-15, -10), (-15, -11.347298632), (-15, -18), align=None)
    extrude(amount=-CUT_EXTRUDE19_DEPTH, mode=Mode.SUBTRACT)

    # Sketch35 → Boss-Extrude24 (add)
    with BuildSketch(Plane(origin=(0, -18, 0), x_dir=(-1, 0, 0), z_dir=(0, -1, 0))):
        with Locations((5, -10)):
            Rectangle(SKETCH35_W, SKETCH35_H)
    extrude(amount=-BOSS_EXTRUDE24_DEPTH)

    # Sketch36 → Boss-Extrude25 (add)
    with BuildSketch(Plane.XZ.offset(18)):
        with Locations((-5, 10)):
            Rectangle(SKETCH36_W, SKETCH36_H)
    extrude(amount=-BOSS_EXTRUDE25_DEPTH)

    # Sketch37 → Cut-Extrude20 (cut)
    with BuildSketch(Plane(origin=(0, -6, 0), x_dir=(1, 0, 0), z_dir=(0, 1, 0))):
        with Locations((4.211294313, -9.680572291)):
            Rectangle(SKETCH37_W, SKETCH37_H)
    extrude(amount=-CUT_EXTRUDE20_DEPTH, mode=Mode.SUBTRACT)

    # Fillet12
    fillet12_edges = [part.edges().sort_by_distance(p)[0] for p in [
        (0, -8, -5),
        (0, -8, 25),
    ]]
    fillet(fillet12_edges, radius=FILLET12_R)

    # Sketch38 → Boss-Extrude26 (add)
    with BuildSketch(Plane.XZ.offset(18)):
        with Locations((-5, 10)):
            Rectangle(SKETCH38_W, SKETCH38_H)
    extrude(amount=BOSS_EXTRUDE26_DEPTH)

    # Sketch39 → Boss-Extrude27 (add)
    with BuildSketch(Plane(origin=(0, 0, 4), x_dir=(-1, 0, 0), z_dir=(0, 0, -1))):
        with Locations((5, -27.46)):
            Rectangle(SKETCH39_W, SKETCH39_H)
        with Locations((5, -62.5)):
            Rectangle(SKETCH39_W, SKETCH39_H)
    extrude(amount=BOSS_EXTRUDE27_DEPTH)

    # Sketch41 → Boss-Extrude28 (add)
    with BuildSketch(Plane(origin=(0, 0, 0), x_dir=(0, 0, -1), z_dir=(1, 0, 0))):
        with Locations((13.5, -44.98)):
            Rectangle(SKETCH41_W, SKETCH41_H)
        with Locations((-23.5, -27.46)):
            Rectangle(SKETCH41_W_2, SKETCH41_H_2)
        Polygon((-31, -29.96), (-31, -24.96), (-36, -24.96), (-36, -65), (-31, -65), (-31, -60), align=None)
        with Locations((-23.5, -62.5)):
            Rectangle(SKETCH41_W_2, SKETCH41_H_2)
    extrude(amount=-BOSS_EXTRUDE28_DEPTH)

    # Sketch42 → Boss-Extrude29 (add)
    with BuildSketch(Plane(origin=(0, 0, -16), x_dir=(-1, 0, 0), z_dir=(0, 0, -1))):
        with Locations((5, -27.46)):
            Rectangle(SKETCH42_W, SKETCH42_H)
        with Locations((5, -62.5)):
            Rectangle(SKETCH42_W, SKETCH42_H)
    extrude(amount=BOSS_EXTRUDE29_DEPTH)

    # Sketch43 → Boss-Extrude30 (add)
    with BuildSketch(Plane.XY.offset(36)):
        with Locations((-5, -27.46)):
            Rectangle(SKETCH43_W, SKETCH43_H)
        with Locations((-5, -62.5)):
            Rectangle(SKETCH43_W, SKETCH43_H)
    extrude(amount=BOSS_EXTRUDE30_DEPTH)

    # Sketch44 → Cut-Extrude21 (cut)
    with BuildSketch(Plane.XZ.offset(65)):
        with Locations(Location((-7.5, 38.5, 0), (0, 0, 270))):
            Circle(SKETCH44_R)
        with Locations(Location((-2.5, 38.5, 0), (0, 0, 270))):
            Circle(SKETCH44_R)
        with Locations(Location((-7.65412453, -18.65412453, 0), (0, 0, 270))):
            Circle(SKETCH44_R)
        with Locations(Location((-2.65412453, -18.65412453, 0), (0, 0, 270))):
            Circle(SKETCH44_R)
    extrude(amount=-CUT_EXTRUDE21_DEPTH, mode=Mode.SUBTRACT)

    # Fillet13
    fillet13_edges = [part.edges().sort_by_distance(p)[0] for p in [
        (-5, -24.96, 4),
        (-5, -60, -11),
        (-5, -29.96, -11),
        (-5, -24.96, 16),
        (-5, -29.96, 31),
        (-5, -60, 31),
        (0, -27.46, -21),
        (-10, -27.46, -21),
        (0, -62.5, -21),
        (-10, -62.5, -21),
        (-10, -27.46, 41),
        (0, -27.46, 41),
        (-10, -62.5, 41),
        (0, -62.5, 41),
    ]]
    fillet(fillet13_edges, radius=FILLET13_R)

    # Sketch45 → Boss-Extrude31 (add)
    with BuildSketch(Plane.ZY.offset(10)):
        with Locations((10, -44.98)):
            Rectangle(SKETCH45_W, SKETCH45_H)
    extrude(amount=-BOSS_EXTRUDE31_DEPTH)

    # Sketch46 → Cut-Extrude22 (cut)
    with BuildSketch(Plane.ZY.offset(10)):
        with Locations(Location((14.837842206, -39.906994698, 0), (0, 0, 270))):
            Circle(SKETCH46_R)
        with Locations(Location((14.837842206, -50.053005302, 0), (0, 0, 270))):
            Circle(SKETCH46_R)
        with Locations(Location((5.162157794, -39.906994698, 0), (0, 0, 270))):
            Circle(SKETCH46_R)
        with Locations(Location((5.162157794, -50.053005302, 0), (0, 0, 270))):
            Circle(SKETCH46_R)
        with Locations(Location((10, -44.98, 0), (0, 0, 270))):
            Circle(SKETCH46_R)
    extrude(amount=-CUT_EXTRUDE22_DEPTH, mode=Mode.SUBTRACT)

    # Fillet14
    fillet14_edges = [part.edges().sort_by_distance(p)[0] for p in [
        (-5, -60, 18),
        (-5, -29.96, 2),
        (-5, -29.96, 18),
        (-5, -60, 2),
    ]]
    fillet(fillet14_edges, radius=FILLET14_R)


solid = part.part
